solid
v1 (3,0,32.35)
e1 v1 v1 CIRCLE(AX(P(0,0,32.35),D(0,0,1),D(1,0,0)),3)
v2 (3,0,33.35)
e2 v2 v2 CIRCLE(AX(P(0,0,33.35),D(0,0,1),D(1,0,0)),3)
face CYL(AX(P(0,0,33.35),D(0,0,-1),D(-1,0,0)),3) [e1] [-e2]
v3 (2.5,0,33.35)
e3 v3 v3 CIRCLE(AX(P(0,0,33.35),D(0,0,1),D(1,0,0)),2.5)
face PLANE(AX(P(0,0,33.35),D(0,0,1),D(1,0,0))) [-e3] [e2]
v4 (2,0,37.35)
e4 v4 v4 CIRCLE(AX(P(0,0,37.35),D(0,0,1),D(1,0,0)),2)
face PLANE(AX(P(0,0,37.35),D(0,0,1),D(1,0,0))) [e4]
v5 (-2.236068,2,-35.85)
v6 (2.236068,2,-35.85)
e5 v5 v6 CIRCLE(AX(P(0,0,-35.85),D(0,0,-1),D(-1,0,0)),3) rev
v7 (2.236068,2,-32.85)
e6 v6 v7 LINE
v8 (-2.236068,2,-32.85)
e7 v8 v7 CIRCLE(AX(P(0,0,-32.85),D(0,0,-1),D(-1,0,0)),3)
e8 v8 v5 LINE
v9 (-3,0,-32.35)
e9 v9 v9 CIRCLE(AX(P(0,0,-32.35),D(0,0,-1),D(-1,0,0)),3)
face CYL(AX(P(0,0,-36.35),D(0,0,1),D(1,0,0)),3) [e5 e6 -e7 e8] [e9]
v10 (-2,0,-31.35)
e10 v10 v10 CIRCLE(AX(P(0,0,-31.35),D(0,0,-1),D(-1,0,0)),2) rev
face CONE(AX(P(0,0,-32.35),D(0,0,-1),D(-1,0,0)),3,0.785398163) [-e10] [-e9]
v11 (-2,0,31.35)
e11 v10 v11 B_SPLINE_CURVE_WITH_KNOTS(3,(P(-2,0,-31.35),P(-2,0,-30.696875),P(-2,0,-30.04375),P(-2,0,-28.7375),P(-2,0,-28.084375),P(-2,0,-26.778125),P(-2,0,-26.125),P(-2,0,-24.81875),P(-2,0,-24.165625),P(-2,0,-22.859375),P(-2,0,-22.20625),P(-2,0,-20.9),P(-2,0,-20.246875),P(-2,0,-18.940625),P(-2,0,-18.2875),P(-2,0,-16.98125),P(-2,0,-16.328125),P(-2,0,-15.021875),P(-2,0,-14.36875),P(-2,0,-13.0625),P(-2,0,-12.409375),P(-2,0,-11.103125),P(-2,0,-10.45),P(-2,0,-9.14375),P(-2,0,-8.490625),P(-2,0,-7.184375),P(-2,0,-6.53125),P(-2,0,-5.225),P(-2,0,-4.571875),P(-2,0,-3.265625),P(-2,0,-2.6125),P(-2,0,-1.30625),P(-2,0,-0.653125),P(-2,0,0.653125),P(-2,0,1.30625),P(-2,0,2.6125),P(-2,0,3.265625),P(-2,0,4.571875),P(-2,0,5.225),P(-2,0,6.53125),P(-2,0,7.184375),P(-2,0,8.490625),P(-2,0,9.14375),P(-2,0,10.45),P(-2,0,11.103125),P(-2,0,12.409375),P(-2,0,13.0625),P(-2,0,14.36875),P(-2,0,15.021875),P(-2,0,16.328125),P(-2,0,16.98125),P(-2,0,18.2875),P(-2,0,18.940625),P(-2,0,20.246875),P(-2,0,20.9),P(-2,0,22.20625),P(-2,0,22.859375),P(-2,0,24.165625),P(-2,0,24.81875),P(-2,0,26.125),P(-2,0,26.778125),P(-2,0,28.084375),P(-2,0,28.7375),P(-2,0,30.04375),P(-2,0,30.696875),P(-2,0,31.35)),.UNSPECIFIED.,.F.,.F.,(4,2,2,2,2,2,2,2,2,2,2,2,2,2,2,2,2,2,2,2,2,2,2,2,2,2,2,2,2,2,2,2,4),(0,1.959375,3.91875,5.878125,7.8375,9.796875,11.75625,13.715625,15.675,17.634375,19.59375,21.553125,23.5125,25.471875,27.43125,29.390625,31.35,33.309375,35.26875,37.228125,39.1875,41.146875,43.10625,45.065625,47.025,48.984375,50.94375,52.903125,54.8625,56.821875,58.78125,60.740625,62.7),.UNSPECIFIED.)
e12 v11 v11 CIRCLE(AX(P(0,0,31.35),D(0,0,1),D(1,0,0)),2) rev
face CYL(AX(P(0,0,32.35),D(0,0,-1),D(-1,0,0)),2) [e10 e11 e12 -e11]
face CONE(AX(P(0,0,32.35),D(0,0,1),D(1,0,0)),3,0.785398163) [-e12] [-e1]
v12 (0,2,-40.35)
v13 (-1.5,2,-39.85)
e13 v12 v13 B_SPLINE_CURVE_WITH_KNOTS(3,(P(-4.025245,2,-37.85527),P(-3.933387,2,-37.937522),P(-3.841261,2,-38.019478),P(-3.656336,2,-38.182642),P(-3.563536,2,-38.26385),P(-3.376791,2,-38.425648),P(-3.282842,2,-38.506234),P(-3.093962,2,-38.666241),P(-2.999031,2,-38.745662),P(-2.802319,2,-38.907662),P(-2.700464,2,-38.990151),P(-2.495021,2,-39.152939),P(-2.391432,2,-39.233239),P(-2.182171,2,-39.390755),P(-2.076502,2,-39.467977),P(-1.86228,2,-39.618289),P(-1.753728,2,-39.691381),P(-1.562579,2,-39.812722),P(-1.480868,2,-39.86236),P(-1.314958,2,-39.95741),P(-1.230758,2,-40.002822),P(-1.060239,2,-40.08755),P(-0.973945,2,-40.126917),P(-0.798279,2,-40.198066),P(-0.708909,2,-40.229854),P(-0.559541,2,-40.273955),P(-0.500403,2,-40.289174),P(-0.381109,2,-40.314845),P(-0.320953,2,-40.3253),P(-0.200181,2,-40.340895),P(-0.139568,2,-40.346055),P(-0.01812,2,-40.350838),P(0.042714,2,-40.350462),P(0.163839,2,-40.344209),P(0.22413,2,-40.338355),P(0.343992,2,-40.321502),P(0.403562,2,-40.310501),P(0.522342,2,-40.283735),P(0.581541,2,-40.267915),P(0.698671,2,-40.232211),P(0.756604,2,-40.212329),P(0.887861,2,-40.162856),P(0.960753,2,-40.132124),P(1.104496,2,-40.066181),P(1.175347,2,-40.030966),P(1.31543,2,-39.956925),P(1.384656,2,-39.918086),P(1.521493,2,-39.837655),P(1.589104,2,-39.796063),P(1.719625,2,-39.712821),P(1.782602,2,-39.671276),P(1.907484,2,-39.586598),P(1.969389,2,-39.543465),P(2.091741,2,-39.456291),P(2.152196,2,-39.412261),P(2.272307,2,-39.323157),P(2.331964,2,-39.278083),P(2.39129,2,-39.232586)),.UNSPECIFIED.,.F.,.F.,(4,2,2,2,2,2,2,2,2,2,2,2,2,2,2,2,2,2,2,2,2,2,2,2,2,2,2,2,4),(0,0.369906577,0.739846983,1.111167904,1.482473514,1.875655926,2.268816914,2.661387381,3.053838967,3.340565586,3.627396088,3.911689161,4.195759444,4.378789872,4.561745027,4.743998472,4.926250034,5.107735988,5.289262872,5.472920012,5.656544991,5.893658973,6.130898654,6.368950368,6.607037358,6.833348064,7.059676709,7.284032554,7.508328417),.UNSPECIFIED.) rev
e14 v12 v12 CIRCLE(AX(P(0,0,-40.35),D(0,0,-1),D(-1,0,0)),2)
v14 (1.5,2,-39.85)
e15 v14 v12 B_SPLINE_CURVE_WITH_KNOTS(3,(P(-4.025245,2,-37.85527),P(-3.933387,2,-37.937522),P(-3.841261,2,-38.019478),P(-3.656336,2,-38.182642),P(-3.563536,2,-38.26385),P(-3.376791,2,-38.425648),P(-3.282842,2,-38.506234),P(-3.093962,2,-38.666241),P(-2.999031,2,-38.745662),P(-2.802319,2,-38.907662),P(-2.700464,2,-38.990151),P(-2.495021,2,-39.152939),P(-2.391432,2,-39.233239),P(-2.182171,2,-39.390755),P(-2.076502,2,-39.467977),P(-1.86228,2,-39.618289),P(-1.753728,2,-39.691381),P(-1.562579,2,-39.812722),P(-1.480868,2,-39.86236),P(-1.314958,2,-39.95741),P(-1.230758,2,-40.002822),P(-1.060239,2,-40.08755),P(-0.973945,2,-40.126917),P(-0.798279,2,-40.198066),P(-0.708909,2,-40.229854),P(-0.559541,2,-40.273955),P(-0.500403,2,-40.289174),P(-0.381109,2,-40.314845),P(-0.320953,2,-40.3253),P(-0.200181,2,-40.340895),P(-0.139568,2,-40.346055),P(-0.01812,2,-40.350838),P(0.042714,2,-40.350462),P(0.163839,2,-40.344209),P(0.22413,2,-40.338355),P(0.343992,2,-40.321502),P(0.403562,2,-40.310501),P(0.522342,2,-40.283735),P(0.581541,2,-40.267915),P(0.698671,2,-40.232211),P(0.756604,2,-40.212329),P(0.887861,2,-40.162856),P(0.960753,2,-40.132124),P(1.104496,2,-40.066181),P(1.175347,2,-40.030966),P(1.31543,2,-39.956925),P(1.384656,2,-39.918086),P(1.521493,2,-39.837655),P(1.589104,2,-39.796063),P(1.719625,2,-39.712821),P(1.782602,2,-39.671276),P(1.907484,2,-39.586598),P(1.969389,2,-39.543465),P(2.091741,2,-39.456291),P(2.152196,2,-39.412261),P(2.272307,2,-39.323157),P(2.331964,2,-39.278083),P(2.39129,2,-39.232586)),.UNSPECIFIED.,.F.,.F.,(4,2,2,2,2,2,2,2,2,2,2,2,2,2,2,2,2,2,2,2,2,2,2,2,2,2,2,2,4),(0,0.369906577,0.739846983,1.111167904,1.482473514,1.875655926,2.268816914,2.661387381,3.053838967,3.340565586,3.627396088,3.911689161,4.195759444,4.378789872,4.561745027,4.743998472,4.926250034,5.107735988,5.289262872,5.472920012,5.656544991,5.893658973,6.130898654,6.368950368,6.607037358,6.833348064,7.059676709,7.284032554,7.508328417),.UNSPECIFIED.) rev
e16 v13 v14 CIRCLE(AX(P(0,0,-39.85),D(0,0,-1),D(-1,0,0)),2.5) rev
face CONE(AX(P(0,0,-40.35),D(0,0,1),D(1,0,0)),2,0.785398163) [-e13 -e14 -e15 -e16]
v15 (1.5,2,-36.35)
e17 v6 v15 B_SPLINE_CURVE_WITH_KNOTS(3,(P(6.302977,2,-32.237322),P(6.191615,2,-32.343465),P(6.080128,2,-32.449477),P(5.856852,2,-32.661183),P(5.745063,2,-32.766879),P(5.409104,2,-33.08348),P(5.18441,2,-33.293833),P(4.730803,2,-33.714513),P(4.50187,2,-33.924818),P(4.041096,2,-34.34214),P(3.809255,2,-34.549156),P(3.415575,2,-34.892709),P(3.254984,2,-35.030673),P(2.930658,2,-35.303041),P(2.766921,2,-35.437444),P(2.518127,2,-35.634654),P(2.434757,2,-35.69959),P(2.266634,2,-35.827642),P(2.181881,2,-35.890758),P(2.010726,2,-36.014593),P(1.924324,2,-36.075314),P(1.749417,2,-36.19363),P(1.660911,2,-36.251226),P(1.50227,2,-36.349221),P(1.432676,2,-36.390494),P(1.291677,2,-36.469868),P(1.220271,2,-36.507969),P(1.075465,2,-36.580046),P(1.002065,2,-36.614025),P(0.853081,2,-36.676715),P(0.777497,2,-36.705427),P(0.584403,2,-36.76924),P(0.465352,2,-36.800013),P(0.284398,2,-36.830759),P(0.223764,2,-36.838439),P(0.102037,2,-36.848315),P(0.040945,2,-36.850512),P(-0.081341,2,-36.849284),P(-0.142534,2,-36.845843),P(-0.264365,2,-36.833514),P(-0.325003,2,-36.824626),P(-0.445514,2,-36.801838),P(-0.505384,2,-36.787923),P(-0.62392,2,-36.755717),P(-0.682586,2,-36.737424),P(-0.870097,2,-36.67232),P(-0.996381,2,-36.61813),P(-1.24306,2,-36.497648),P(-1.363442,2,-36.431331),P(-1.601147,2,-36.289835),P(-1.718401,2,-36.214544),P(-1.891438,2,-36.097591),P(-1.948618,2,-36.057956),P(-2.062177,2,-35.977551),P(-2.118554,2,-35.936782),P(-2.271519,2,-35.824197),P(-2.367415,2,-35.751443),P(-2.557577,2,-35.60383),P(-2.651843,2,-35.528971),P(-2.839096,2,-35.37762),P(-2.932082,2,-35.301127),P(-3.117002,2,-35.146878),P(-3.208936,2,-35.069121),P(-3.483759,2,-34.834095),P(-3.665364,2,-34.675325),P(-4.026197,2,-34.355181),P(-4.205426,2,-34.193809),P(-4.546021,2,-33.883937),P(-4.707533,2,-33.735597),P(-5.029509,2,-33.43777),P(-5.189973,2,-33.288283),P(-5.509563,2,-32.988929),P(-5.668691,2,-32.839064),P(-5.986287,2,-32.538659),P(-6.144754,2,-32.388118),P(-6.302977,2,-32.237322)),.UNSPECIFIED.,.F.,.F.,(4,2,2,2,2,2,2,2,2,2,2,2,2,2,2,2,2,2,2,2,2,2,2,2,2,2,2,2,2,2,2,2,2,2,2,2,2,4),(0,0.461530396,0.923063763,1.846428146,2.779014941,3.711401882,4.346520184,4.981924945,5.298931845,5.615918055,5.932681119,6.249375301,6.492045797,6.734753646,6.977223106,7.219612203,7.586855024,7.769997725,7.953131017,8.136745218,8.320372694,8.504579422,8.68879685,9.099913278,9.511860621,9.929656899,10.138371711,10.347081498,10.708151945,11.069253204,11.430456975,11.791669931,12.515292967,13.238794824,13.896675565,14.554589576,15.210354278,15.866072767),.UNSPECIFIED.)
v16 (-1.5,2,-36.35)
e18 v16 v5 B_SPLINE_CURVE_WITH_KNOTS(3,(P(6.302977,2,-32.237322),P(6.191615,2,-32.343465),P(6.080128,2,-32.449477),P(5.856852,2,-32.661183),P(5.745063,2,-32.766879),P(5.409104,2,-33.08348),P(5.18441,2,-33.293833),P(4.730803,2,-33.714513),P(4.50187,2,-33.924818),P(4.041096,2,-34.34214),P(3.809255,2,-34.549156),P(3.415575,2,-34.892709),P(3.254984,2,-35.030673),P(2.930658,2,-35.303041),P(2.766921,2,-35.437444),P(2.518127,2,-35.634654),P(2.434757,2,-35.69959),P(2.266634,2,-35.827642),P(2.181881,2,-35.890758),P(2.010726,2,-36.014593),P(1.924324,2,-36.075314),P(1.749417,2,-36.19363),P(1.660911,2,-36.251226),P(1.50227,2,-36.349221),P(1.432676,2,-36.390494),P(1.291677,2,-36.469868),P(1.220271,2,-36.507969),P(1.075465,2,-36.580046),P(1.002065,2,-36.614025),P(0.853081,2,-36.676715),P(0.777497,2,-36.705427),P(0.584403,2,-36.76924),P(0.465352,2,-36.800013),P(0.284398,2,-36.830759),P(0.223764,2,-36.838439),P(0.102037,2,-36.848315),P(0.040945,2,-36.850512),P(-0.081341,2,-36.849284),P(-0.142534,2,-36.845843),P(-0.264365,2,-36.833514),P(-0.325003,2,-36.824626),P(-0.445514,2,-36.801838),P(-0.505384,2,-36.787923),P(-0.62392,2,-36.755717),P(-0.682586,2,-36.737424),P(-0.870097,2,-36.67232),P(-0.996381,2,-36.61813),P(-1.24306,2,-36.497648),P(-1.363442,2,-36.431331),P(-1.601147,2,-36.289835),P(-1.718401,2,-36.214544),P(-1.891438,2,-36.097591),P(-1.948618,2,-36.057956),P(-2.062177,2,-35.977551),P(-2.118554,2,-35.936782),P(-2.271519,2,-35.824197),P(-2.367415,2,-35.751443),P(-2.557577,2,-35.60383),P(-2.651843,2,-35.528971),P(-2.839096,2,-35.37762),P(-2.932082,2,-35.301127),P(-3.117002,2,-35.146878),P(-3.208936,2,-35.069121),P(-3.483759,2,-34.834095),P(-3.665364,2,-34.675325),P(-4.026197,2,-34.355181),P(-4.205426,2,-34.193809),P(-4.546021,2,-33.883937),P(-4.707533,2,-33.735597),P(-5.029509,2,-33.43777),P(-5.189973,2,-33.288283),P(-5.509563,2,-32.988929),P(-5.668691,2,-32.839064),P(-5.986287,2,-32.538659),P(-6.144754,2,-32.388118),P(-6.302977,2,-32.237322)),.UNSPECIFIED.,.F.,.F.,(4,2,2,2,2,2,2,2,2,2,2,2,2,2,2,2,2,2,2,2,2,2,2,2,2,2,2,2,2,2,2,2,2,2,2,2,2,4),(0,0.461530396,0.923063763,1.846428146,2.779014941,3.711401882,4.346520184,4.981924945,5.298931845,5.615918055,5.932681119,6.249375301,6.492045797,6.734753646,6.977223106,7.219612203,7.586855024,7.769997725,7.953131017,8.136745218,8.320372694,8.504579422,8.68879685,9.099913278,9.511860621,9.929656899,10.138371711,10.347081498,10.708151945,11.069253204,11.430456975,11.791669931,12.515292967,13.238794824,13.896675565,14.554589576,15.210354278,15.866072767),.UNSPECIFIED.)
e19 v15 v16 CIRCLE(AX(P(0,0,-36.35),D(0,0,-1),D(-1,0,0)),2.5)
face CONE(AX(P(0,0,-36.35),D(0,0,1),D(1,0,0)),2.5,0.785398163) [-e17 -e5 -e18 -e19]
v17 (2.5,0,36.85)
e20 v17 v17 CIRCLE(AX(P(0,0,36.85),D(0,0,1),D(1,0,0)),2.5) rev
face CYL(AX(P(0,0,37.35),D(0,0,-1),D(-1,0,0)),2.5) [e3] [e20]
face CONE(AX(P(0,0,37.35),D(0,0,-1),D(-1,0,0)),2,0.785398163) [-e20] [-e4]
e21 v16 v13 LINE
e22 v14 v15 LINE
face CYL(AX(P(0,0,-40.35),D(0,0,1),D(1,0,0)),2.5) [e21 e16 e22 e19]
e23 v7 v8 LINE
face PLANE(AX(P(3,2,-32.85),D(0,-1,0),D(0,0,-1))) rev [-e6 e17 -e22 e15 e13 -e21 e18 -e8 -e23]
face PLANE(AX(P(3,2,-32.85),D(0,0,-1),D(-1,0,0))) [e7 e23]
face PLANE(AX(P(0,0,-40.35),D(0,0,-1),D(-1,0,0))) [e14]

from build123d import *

# Parameters (mm, degrees)
SKETCH_1_R          = 2
EXTRUDE_1_DEPTH     = 32.35
SKETCH_2_R          = 3
EXTRUDE_2_DEPTH     = 1
SKETCH_3_R          = 2.5
EXTRUDE_3_DEPTH     = 4
EXTRUDE_START       = 4
SKETCH_4_R          = 3
EXTRUDE_4_DEPTH     = 4
SKETCH_5_R          = 2.5
EXTRUDE_5_DEPTH     = 4
CHAMFER_1_SIZE      = 0.5
CHAMFER_2_SIZE      = 0.5
SKETCH_6_W          = 6
SKETCH_6_H          = 3
CUT_EXTRUDE_6_DEPTH = 7.5
CHAMFER1_SIZE       = 1


with BuildPart() as part:
    # 草图1 → 拉伸1 (new, symmetric)
    with BuildSketch(Plane.XY):
        with Locations(Location((0, 0, 0), (0, 0, 180))):
            Circle(SKETCH_1_R)
    extrude(amount=EXTRUDE_1_DEPTH, both=True)

    # 草图2 → 拉伸2 (add)
    with BuildSketch(Plane.XY.offset(32.35)):
        Circle(SKETCH_2_R)
    extrude(amount=EXTRUDE_2_DEPTH)

    # 草图3 → 拉伸3 (add)
    with BuildSketch(Plane.XY.offset(33.35)):
        Circle(SKETCH_3_R)
    extrude(amount=EXTRUDE_3_DEPTH)

    # 草图4 → 拉伸4 (add)
    with BuildSketch(Plane(origin=(0, 0, -32.35), x_dir=(-1, 0, 0), z_dir=(0, 0, -1)).offset(EXTRUDE_START)):
        with Locations(Location((0, 0, 0), (0, 0, 180))):
            Circle(SKETCH_4_R)
    extrude(amount=-EXTRUDE_4_DEPTH)

    # 草图5 → 拉伸5 (add)
    with BuildSketch(Plane(origin=(0, 0, -36.35), x_dir=(-1, 0, 0), z_dir=(0, 0, -1)).offset(EXTRUDE_START)):
        with Locations(Location((0, 0, 0), (0, 0, 180))):
            Circle(SKETCH_5_R)
    extrude(amount=-EXTRUDE_5_DEPTH)

    # 倒角1
    chamfer_1_edges = [part.edges().sort_by_distance(p)[0] for p in [
        (-2.5, 0, 37.35),
        (-2.5, 0, -40.35),
    ]]
    chamfer(chamfer_1_edges, length=CHAMFER_1_SIZE)

    # 倒角2
    chamfer_2_edges = [part.edges().sort_by_distance(p)[0] for p in [
        (-3, 0, -36.35),
    ]]
    chamfer(chamfer_2_edges, length=CHAMFER_2_SIZE - 0.0001)  # a hair under: the kernel refuses the full size

    # 草图6 → 拉伸6 (cut)
    with BuildSketch(Plane(origin=(0, 0, -40.35), x_dir=(-1, 0, 0), z_dir=(0, 0, -1))):
        with Locations((0, 3.5)):
            Rectangle(SKETCH_6_W, SKETCH_6_H)
    extrude(amount=-CUT_EXTRUDE_6_DEPTH, mode=Mode.SUBTRACT)

    # Chamfer1
    chamfer1_edges = [part.edges().sort_by_distance(p)[0] for p in [
        (2, 0, -32.35),
        (2, 0, 32.35),
    ]]
    chamfer(chamfer1_edges, length=CHAMFER1_SIZE - 0.0001)  # a hair under: the kernel refuses the full size


solid = part.part
